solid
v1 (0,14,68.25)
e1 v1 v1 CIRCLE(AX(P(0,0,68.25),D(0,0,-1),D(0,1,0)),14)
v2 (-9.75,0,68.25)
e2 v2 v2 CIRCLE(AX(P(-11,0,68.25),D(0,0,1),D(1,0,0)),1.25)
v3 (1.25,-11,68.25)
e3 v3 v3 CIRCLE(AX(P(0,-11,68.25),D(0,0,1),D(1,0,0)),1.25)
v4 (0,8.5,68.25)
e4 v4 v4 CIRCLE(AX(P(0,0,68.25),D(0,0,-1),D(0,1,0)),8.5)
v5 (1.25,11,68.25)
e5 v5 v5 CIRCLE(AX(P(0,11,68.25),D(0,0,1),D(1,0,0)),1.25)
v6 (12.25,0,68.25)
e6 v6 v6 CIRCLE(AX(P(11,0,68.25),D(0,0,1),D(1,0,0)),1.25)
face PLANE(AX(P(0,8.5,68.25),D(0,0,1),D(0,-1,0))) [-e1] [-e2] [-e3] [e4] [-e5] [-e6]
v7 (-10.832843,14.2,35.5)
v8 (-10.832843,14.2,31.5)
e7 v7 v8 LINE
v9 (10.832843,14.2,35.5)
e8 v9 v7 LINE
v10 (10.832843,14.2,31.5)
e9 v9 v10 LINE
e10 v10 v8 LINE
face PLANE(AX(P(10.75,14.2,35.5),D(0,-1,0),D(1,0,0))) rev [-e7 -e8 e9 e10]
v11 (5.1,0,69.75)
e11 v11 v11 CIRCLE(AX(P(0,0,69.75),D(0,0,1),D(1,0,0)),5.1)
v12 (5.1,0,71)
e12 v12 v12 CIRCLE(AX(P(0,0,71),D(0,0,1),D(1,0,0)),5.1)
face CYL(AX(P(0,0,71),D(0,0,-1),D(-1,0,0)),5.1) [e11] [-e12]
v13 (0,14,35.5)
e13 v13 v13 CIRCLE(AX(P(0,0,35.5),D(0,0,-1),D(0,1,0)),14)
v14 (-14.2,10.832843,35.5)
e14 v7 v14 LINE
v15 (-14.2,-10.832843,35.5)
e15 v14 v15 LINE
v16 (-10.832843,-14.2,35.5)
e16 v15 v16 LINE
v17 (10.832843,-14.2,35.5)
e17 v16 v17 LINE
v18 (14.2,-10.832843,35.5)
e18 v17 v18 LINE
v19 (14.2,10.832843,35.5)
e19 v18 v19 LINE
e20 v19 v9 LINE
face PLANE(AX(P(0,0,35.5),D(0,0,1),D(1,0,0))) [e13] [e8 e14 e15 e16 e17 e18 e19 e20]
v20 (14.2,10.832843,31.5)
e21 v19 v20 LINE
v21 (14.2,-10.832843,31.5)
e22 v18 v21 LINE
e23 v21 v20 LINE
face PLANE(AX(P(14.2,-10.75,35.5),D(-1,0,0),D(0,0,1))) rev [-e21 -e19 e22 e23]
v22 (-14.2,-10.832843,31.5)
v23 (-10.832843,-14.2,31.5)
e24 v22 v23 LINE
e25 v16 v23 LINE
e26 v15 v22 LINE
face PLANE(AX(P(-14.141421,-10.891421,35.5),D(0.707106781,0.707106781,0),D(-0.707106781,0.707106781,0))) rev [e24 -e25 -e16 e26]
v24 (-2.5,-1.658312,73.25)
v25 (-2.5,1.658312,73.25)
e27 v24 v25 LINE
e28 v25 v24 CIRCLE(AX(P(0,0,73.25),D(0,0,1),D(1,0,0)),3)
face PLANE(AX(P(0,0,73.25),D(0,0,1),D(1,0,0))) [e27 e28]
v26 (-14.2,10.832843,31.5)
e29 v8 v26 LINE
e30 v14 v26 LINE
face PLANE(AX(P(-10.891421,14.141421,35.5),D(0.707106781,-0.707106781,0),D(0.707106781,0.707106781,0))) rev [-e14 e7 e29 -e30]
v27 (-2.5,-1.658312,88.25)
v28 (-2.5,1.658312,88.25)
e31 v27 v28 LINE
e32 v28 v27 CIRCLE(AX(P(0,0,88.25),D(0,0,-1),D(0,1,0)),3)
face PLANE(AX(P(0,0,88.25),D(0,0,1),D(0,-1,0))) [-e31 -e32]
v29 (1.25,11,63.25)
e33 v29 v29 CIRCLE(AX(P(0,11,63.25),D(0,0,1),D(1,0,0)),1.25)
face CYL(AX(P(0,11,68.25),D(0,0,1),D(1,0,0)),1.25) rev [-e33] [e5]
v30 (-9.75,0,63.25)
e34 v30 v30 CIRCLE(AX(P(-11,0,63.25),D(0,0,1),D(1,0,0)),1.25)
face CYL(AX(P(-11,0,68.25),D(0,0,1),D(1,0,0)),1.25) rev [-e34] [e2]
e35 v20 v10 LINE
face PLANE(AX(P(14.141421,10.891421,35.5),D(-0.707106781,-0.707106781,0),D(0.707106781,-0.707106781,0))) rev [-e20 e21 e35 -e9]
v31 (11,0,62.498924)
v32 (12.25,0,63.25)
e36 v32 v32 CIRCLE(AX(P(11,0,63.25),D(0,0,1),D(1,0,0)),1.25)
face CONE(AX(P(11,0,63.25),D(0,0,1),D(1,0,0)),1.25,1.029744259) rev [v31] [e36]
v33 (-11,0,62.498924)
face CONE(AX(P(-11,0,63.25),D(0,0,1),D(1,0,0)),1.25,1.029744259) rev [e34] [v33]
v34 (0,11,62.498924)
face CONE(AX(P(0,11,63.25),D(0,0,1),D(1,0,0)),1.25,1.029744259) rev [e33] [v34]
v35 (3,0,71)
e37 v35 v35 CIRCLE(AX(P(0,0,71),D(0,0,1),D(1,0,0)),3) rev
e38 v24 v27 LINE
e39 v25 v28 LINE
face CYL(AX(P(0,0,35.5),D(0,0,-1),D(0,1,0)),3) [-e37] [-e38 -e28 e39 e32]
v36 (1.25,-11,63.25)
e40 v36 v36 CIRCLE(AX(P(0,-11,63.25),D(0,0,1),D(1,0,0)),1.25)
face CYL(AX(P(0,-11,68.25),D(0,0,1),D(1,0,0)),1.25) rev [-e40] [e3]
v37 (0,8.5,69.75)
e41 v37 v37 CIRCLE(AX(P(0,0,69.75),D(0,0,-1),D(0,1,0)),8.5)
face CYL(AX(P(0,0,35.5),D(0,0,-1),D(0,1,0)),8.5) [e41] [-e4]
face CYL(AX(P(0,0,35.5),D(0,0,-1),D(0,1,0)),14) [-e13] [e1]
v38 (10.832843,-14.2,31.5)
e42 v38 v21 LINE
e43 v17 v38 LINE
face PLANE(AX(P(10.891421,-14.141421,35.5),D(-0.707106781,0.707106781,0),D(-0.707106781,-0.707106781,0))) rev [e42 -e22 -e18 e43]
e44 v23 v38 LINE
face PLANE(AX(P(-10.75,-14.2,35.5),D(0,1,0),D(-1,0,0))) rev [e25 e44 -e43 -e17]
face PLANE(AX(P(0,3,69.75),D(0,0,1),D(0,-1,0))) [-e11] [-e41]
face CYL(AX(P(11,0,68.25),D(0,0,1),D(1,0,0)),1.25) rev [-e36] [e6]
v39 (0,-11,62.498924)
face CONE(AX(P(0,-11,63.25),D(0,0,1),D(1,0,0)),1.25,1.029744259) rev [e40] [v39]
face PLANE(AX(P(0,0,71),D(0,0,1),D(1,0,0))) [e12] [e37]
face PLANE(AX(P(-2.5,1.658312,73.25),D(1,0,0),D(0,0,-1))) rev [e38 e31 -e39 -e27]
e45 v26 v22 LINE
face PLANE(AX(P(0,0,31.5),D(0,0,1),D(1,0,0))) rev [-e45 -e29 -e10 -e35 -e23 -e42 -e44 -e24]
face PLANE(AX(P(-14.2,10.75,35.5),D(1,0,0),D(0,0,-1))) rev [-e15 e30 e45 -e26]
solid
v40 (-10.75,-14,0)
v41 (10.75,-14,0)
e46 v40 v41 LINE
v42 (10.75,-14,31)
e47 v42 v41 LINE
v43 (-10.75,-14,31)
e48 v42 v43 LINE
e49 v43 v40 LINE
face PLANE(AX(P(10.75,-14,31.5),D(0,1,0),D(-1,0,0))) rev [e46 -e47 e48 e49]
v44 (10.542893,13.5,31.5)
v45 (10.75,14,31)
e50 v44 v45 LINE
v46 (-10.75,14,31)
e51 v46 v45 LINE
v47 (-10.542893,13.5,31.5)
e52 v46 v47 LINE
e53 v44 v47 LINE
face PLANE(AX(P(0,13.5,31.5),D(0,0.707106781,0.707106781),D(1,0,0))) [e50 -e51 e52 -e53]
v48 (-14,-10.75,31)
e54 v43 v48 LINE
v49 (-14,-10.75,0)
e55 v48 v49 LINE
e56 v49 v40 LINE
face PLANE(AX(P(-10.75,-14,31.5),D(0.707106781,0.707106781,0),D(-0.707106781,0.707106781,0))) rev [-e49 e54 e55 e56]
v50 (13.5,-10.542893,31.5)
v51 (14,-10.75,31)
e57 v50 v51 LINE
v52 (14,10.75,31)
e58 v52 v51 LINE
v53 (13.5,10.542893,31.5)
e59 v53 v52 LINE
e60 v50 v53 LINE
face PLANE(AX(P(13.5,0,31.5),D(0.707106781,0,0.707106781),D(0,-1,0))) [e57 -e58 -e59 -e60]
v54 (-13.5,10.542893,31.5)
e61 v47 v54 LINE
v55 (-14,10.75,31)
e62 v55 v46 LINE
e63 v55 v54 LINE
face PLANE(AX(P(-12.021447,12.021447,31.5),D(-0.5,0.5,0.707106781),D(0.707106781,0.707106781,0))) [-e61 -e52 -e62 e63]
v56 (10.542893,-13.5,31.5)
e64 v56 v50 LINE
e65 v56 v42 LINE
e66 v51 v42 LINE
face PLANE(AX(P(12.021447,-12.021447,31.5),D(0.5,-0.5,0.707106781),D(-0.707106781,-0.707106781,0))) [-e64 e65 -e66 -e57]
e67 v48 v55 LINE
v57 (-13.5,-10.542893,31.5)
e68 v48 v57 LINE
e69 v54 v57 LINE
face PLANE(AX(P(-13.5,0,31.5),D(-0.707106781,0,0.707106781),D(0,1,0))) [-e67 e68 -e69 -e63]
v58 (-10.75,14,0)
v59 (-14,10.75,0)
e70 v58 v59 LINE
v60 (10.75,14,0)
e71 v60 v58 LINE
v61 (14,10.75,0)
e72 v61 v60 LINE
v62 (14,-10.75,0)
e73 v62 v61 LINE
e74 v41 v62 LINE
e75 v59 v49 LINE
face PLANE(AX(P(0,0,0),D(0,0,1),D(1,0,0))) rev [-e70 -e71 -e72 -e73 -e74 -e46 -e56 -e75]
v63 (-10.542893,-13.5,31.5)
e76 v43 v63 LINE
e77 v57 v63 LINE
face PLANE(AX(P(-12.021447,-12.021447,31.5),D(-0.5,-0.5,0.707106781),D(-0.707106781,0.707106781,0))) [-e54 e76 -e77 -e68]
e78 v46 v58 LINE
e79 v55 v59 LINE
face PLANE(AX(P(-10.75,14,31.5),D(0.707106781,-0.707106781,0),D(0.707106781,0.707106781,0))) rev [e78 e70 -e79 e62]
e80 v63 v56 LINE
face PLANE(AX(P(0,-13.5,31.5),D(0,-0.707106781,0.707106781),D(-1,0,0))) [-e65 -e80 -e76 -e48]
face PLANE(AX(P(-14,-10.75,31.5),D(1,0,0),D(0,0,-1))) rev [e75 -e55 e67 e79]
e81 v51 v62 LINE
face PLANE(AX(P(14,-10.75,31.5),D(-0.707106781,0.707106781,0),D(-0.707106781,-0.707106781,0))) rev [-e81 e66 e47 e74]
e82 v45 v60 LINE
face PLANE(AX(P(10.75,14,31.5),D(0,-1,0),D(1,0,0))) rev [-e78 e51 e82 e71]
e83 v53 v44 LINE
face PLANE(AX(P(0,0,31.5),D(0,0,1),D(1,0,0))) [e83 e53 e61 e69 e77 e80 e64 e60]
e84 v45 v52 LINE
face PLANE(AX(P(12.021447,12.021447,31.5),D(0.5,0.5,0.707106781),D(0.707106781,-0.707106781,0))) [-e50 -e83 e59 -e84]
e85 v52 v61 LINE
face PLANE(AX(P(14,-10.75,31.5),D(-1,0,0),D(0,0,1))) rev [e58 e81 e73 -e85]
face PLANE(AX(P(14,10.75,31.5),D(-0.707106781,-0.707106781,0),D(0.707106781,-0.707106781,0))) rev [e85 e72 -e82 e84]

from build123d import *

# Parameters (mm, degrees)
BOSS_EXTRUDE1_DEPTH            = 31.5
BOSS_EXTRUDE2_DEPTH            = 4
CHAMFER1_SIZE                  = 0.5
M3X0_5_TAPPED_HOLE1_AT_2_COUNT = 2
M3X0_5_TAPPED_HOLE1_AT_2_PITCH = 15.556349186
M3X0_5_TAPPED_HOLE1_AT_3_COUNT = 2
M3X0_5_TAPPED_HOLE1_AT_3_PITCH = 22
M3X0_5_TAPPED_HOLE1_AT_4_COUNT = 2
M3X0_5_TAPPED_HOLE1_AT_4_PITCH = 15.556349186
SKETCH8_R                      = 5.1
SKETCH8_R_2                    = 3
BOSS_EXTRUDE3_DEPTH            = 1.25
CUT_EXTRUDE1_DEPTH             = 15
MOVE_START                     = 31.5
MOVE_FACE1_DEPTH               = 4


# Read off the part's stored shape, not the designer's step: Move Face1
with BuildPart() as part:
    # Sketch1 → Boss-Extrude1 (new body)
    with BuildSketch(Plane.XY):
        Polygon((10.75, -14), (-10.75, -14), (-14, -10.75), (-14, 10.75), (-10.75, 14), (10.75, 14), (14, 10.75), (14, -10.75), align=None)
    extrude(amount=BOSS_EXTRUDE1_DEPTH)

    # Chamfer1
    chamfer1_edges = [part.edges().sort_by_distance(p)[0] for p in [
        (-12.375, 12.375, 31.5),
        (-14, 0, 31.5),
        (-12.375, -12.375, 31.5),
        (0, -14, 31.5),
        (12.375, -12.375, 31.5),
        (14, 0, 31.5),
        (12.375, 12.375, 31.5),
        (0, 14, 31.5),
    ]]
    chamfer(chamfer1_edges, length=CHAMFER1_SIZE)


with BuildPart() as body_2:
    # Sketch3 → Boss-Extrude2 (new body)
    with BuildSketch(Plane.XY.offset(31.5)):
        Polygon((14, 10.75), (10.75, 14), (-10.75, 14), (-14, 10.75), (-14, -10.75), (-10.75, -14), (10.75, -14), (14, -10.75), align=None)
    extrude(amount=BOSS_EXTRUDE2_DEPTH)

    # Sketch4 → Revolve1 (revolve)
    with BuildSketch(Plane(origin=(0, 0, 0), x_dir=(0, 0, -1), z_dir=(1, 0, 0))):
        Polygon((-88.25, 0), (-88.25, 3), (-69.75, 3), (-69.75, 8.5), (-68.25, 8.5), (-68.25, 14), (-35.5, 14), (-35.5, 0), align=None)
    revolve(axis=Axis((0, 0, 35.5), (0, 0, 1)))

    # Sketch7 → M3x0.5 Tapped Hole1 (revolve, cut)
    with BuildSketch(Plane(origin=(0, 11, 68.25), x_dir=(0, -1, 0), z_dir=(1, 0, 0))):
        Polygon((0, 0), (0, 5.751075774), (1.25, 5), (1.25, 0), align=None)
    m3x0_5_tapped_hole1 = revolve(axis=Axis((0, 11, 74.6), (0, 0, -1)), mode=Mode.SUBTRACT)

    # M3x0.5 Tapped Hole1 at 2: M3x0.5 Tapped Hole1 ×2
    with Locations(*[Vector(0.7071067811865472, -0.7071067811865478, 0) * (i * M3X0_5_TAPPED_HOLE1_AT_2_PITCH) for i in range(1, M3X0_5_TAPPED_HOLE1_AT_2_COUNT)]):
        add(m3x0_5_tapped_hole1, mode=Mode.SUBTRACT)

    # M3x0.5 Tapped Hole1 at 3: M3x0.5 Tapped Hole1 ×2
    with Locations(*[(0, -i * M3X0_5_TAPPED_HOLE1_AT_3_PITCH, 0) for i in range(1, M3X0_5_TAPPED_HOLE1_AT_3_COUNT)]):
        add(m3x0_5_tapped_hole1, mode=Mode.SUBTRACT)

    # M3x0.5 Tapped Hole1 at 4: M3x0.5 Tapped Hole1 ×2
    with Locations(*[Vector(-0.7071067811865472, -0.7071067811865478, 0) * (i * M3X0_5_TAPPED_HOLE1_AT_4_PITCH) for i in range(1, M3X0_5_TAPPED_HOLE1_AT_4_COUNT)]):
        add(m3x0_5_tapped_hole1, mode=Mode.SUBTRACT)

    # Sketch8 → Boss-Extrude3 (add)
    with BuildSketch(Plane.XY.offset(69.75)):
        Circle(SKETCH8_R)
        with Locations(Location((0, 0, 0), (0, 0, 90))):
            Circle(SKETCH8_R_2, mode=Mode.SUBTRACT)
    extrude(amount=BOSS_EXTRUDE3_DEPTH)

    # Sketch9 → Cut-Extrude1 (cut)
    with BuildSketch(Plane.XY.offset(88.25)):
        with BuildLine():
            Line((-2.5, 1.658312395), (-2.5, -1.658312395))
            ThreePointArc((-2.5, -1.658312395), (-3, 0), (-2.5, 1.658312395))
        make_face()
    extrude(amount=-CUT_EXTRUDE1_DEPTH, mode=Mode.SUBTRACT)

    # Move Face1 outline → Move Face1 (add)
    with BuildSketch(Plane.XY.offset(MOVE_START)):
        Polygon((14.2, -10.832842712), (14.2, 10.832842712), (10.832842712, 14.2), (-10.832842712, 14.2), (-14.2, 10.832842712), (-14.2, -10.832842712), (-10.832842712, -14.2), (10.832842712, -14.2), align=None)
        Polygon((10.75, 14), (14, 10.75), (14, -10.75), (10.75, -14), (-10.75, -14), (-14, -10.75), (-14, 10.75), (-10.75, 14), align=None, mode=Mode.SUBTRACT)
    extrude(amount=MOVE_FACE1_DEPTH)


solid = Compound([part.part, body_2.part])
